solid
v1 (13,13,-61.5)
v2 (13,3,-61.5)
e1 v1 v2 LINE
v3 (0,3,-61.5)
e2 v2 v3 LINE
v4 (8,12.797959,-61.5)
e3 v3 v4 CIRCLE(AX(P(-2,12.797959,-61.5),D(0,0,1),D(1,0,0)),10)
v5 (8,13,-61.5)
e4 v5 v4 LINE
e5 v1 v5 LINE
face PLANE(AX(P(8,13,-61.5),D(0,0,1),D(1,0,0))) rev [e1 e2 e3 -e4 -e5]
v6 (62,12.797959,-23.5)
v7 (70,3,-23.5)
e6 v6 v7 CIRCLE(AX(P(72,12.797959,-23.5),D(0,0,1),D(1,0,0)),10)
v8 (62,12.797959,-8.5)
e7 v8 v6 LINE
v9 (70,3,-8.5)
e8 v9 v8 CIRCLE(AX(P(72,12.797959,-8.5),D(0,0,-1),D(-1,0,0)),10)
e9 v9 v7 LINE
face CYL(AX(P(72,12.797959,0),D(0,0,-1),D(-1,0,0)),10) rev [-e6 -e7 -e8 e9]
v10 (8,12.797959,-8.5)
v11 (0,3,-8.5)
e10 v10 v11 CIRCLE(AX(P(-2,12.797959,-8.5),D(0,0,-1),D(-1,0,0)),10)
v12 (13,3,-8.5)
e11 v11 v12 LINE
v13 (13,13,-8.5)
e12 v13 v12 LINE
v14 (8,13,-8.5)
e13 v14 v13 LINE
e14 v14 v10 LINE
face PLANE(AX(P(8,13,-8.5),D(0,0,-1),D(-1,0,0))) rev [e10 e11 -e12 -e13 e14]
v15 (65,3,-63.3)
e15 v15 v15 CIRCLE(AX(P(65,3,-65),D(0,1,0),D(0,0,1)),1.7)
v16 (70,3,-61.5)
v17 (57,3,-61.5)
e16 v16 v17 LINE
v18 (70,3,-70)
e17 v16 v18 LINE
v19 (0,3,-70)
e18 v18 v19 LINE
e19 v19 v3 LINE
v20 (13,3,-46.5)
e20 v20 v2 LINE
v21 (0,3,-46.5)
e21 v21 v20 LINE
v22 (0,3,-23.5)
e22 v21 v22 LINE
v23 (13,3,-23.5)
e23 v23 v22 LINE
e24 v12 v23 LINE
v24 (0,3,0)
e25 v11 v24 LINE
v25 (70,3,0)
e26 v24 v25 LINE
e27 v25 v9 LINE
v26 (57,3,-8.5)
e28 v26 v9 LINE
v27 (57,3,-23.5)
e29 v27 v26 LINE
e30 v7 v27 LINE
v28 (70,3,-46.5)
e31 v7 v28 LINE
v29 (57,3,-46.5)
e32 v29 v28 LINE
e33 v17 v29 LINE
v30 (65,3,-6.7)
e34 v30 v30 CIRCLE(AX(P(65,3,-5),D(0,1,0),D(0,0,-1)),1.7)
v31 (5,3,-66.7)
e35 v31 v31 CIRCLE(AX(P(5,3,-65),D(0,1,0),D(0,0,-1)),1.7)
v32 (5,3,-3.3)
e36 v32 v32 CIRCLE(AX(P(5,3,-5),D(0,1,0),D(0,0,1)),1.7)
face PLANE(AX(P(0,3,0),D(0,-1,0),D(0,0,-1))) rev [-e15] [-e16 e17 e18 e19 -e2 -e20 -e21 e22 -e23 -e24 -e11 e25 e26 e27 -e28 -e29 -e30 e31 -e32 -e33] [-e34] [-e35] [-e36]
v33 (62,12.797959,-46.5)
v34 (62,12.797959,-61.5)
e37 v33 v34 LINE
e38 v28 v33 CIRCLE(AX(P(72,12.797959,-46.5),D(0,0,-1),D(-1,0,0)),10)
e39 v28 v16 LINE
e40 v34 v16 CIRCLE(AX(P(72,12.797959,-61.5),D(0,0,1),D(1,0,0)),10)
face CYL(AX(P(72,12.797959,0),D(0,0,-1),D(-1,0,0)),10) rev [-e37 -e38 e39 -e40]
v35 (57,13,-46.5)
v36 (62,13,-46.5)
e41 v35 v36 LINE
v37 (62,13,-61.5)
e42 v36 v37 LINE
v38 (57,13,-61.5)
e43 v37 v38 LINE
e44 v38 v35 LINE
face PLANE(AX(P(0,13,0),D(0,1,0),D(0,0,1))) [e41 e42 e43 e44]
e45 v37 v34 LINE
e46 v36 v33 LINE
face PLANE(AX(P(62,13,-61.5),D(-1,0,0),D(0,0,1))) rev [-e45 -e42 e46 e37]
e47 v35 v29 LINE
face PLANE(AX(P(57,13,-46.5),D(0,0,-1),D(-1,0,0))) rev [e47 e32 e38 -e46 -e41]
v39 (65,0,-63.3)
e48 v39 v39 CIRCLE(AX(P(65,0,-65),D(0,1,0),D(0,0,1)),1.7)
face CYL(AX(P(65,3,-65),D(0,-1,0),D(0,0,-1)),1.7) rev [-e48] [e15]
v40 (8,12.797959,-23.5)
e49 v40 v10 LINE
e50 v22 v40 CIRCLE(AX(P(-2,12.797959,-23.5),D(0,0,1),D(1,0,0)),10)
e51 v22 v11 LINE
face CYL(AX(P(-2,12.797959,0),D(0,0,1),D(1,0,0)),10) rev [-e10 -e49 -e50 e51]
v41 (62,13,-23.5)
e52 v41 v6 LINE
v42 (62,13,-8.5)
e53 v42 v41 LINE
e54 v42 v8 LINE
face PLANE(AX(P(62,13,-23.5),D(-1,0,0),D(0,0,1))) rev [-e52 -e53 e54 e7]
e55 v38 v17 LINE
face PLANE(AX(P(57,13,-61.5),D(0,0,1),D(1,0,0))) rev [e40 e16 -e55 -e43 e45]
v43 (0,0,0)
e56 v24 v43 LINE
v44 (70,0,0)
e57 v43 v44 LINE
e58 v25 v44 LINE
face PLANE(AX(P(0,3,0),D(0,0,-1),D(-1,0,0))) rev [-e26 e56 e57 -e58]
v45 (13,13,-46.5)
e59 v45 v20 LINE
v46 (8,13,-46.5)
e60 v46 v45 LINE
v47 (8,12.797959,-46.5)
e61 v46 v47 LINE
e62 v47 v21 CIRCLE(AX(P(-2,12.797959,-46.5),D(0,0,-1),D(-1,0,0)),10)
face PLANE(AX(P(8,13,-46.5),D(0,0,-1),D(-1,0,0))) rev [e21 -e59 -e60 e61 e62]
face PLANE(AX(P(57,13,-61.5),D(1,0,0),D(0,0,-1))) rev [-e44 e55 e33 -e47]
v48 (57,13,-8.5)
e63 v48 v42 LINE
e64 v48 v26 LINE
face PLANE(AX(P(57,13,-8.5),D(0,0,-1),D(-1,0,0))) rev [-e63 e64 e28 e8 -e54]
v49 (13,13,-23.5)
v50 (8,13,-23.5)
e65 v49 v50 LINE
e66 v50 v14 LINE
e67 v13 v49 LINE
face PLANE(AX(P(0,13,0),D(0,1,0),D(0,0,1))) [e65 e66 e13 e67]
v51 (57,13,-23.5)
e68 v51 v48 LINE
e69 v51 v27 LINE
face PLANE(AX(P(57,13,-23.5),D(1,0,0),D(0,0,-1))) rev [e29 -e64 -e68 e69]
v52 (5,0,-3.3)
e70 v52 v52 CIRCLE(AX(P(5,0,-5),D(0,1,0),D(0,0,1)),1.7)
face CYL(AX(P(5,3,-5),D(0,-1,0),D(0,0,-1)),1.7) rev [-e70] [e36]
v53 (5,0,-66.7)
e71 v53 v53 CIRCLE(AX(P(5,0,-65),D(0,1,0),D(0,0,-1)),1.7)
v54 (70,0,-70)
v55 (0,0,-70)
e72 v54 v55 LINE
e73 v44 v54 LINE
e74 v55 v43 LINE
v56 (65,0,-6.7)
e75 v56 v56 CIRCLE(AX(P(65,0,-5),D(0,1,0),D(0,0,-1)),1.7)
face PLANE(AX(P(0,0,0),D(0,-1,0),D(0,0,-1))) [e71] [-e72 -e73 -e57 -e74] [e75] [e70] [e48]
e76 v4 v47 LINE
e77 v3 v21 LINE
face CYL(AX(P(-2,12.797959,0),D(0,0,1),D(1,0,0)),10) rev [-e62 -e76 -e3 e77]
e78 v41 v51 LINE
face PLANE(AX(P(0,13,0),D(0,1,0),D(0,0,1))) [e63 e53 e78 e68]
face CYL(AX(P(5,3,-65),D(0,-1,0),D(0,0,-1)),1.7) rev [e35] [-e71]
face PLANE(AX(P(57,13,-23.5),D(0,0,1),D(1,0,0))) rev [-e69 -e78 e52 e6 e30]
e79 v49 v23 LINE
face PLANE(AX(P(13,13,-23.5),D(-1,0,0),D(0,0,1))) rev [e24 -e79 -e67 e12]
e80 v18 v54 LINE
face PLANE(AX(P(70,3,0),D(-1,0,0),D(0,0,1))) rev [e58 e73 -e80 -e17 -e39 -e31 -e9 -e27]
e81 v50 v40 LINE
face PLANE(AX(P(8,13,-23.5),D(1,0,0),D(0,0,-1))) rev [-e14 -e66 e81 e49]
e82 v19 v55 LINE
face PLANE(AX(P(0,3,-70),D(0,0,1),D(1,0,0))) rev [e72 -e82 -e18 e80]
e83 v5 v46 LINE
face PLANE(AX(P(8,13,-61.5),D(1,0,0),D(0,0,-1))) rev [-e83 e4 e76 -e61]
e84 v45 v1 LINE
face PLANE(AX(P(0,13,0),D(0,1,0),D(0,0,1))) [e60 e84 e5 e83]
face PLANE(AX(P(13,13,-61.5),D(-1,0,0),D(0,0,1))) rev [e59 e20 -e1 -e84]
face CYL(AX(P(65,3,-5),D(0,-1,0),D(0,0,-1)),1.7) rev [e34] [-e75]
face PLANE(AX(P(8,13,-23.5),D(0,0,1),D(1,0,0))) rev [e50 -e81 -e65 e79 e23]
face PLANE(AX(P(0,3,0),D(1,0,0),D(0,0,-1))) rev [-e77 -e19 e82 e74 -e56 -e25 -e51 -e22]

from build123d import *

# Parameters (mm, degrees)
SKETCH1_W           = 70
SKETCH1_H           = 70
SKETCH1_R           = 1.7
PLATE_DEPTH         = 3
SKETCH2_W           = 5
SKETCH2_H           = 15
BOSS_EXTRUDE1_DEPTH = 10
FILLET1_R           = 10


with BuildPart() as part:
    # Sketch1 → Plate (new body)
    with BuildSketch(Plane(origin=(0, 0, 0), x_dir=(1, 0, 0), z_dir=(0, 1, 0))):
        with Locations((35, 35)):
            Rectangle(SKETCH1_W, SKETCH1_H)
        with Locations(Location((65, 65, 0), (0, 0, 270))):
            Circle(SKETCH1_R, mode=Mode.SUBTRACT)
        with Locations(Location((5, 65, 0), (0, 0, 90))):
            Circle(SKETCH1_R, mode=Mode.SUBTRACT)
        with Locations(Location((65, 5, 0), (0, 0, 90))):
            Circle(SKETCH1_R, mode=Mode.SUBTRACT)
        with Locations(Location((5, 5, 0), (0, 0, 270))):
            Circle(SKETCH1_R, mode=Mode.SUBTRACT)
    extrude(amount=PLATE_DEPTH)

    # Sketch2 → Boss-Extrude1 (add)
    with BuildSketch(Plane(origin=(0, 3, 0), x_dir=(1, 0, 0), z_dir=(0, 1, 0))):
        with Locations((10.5, 54)):
            Rectangle(SKETCH2_W, SKETCH2_H)
        with Locations((59.5, 54)):
            Rectangle(SKETCH2_W, SKETCH2_H)
        with Locations((10.5, 16)):
            Rectangle(SKETCH2_W, SKETCH2_H)
        with Locations((59.5, 16)):
            Rectangle(SKETCH2_W, SKETCH2_H)
    extrude(amount=BOSS_EXTRUDE1_DEPTH)

    # Fillet1
    # the kernel refuses this fillet: 10 mm, written as the material it adds along each edge
    with BuildSketch(Plane(origin=(8, 3, -22.005102572), x_dir=(-1, 0, 0), z_dir=(0, 0, -1))) as fillet1_piece_1_section:
        with BuildLine():
            CenterArc((10, 9.797958971), FILLET1_R, 180, 78.463040967)
            Line((0, 9.797958971), (-0.2, 9.797958971))
            Line((-0.2, 9.797958971), (-0.2, 0))
            Line((-0.2, 0), (0, -0.2))
            ThreePointArc((0, -0.2), (4, -0.2), (7.96, -0.195959179))
            Line((7.96, -0.195959179), (8, 0))
        make_face()
    fillet1_piece_1 = extrude(amount=39.494897428, mode=Mode.PRIVATE)
    fillet1_piece_1 = split(fillet1_piece_1, bisect_by=Plane(origin=(6.00439902, 5.286170926, -23.5), z_dir=(0, 0, 1)), keep=Keep.TOP, mode=Mode.PRIVATE)
    add(fillet1_piece_1)
    with BuildSketch(Plane(origin=(8, 3, -46.5), x_dir=(-1, 0, 0), z_dir=(0, 0, -1)), Plane(origin=(62, 3, -61.5), x_dir=(1, 0, 0), z_dir=(0, 0, 1)), Plane(origin=(8, 3, -8.5), x_dir=(-1, 0, 0), z_dir=(0, 0, -1)), Plane(origin=(62, 3, -23.5), x_dir=(1, 0, 0), z_dir=(0, 0, 1))) as fillet1_piece_2:
        with BuildLine():
            CenterArc((10, 9.797958971), FILLET1_R, 180, 78.463040967)
            Line((0, 9.797958971), (-0.2, 9.797958971))
            Line((-0.2, 9.797958971), (-0.2, 0))
            Line((-0.2, 0), (0, -0.2))
            ThreePointArc((0, -0.2), (4, -0.2), (7.96, -0.195959179))
            Line((7.96, -0.195959179), (8, 0))
        make_face()
    extrude(amount=15)
    with BuildSketch(Plane(origin=(62, 3, -61.5), x_dir=(1, 0, 0), z_dir=(0, 0, 1))) as fillet1_piece_3_section:
        with BuildLine():
            CenterArc((10, 9.797958971), FILLET1_R, 180, 78.463040967)
            Line((0, 9.797958971), (-0.2, 9.797958971))
            Line((-0.2, 9.797958971), (-0.2, 0))
            Line((-0.2, 0), (0, -0.2))
            ThreePointArc((0, -0.2), (4, -0.2), (7.96, -0.195959179))
            Line((7.96, -0.195959179), (8, 0))
        make_face()
    fillet1_piece_3 = extrude(amount=39.494897428, mode=Mode.PRIVATE)
    fillet1_piece_3 = split(fillet1_piece_3, bisect_by=Plane(origin=(63.99560098, 5.286170926, -23.5), z_dir=(0, 0, 1)), keep=Keep.TOP, mode=Mode.PRIVATE)
    add(fillet1_piece_3)
    with BuildSketch(Plane(origin=(8, 3, -8.5), x_dir=(-1, 0, 0), z_dir=(0, 0, -1))) as fillet1_piece_4_section:
        with BuildLine():
            CenterArc((10, 9.797958971), FILLET1_R, 180, 78.463040967)
            Line((0, 9.797958971), (-0.2, 9.797958971))
            Line((-0.2, 9.797958971), (-0.2, 0))
            Line((-0.2, 0), (0, -0.2))
            ThreePointArc((0, -0.2), (4, -0.2), (7.96, -0.195959179))
            Line((7.96, -0.195959179), (8, 0))
        make_face()
    fillet1_piece_4 = extrude(amount=39.494897428, mode=Mode.PRIVATE)
    fillet1_piece_4 = split(fillet1_piece_4, bisect_by=Plane(origin=(6.00439902, 5.286170926, -46.5), z_dir=(0, 0, -1)), keep=Keep.TOP, mode=Mode.PRIVATE)
    add(fillet1_piece_4)
    with BuildSketch(Plane(origin=(62, 3, -47.994897428), x_dir=(1, 0, 0), z_dir=(0, 0, 1))) as fillet1_piece_5_section:
        with BuildLine():
            CenterArc((10, 9.797958971), FILLET1_R, 180, 78.463040967)
            Line((0, 9.797958971), (-0.2, 9.797958971))
            Line((-0.2, 9.797958971), (-0.2, 0))
            Line((-0.2, 0), (0, -0.2))
            ThreePointArc((0, -0.2), (4, -0.2), (7.96, -0.195959179))
            Line((7.96, -0.195959179), (8, 0))
        make_face()
    fillet1_piece_5 = extrude(amount=39.494897428, mode=Mode.PRIVATE)
    fillet1_piece_5 = split(fillet1_piece_5, bisect_by=Plane(origin=(63.99560098, 5.286170926, -46.5), z_dir=(0, 0, -1)), keep=Keep.TOP, mode=Mode.PRIVATE)
    add(fillet1_piece_5)


solid = part.part
